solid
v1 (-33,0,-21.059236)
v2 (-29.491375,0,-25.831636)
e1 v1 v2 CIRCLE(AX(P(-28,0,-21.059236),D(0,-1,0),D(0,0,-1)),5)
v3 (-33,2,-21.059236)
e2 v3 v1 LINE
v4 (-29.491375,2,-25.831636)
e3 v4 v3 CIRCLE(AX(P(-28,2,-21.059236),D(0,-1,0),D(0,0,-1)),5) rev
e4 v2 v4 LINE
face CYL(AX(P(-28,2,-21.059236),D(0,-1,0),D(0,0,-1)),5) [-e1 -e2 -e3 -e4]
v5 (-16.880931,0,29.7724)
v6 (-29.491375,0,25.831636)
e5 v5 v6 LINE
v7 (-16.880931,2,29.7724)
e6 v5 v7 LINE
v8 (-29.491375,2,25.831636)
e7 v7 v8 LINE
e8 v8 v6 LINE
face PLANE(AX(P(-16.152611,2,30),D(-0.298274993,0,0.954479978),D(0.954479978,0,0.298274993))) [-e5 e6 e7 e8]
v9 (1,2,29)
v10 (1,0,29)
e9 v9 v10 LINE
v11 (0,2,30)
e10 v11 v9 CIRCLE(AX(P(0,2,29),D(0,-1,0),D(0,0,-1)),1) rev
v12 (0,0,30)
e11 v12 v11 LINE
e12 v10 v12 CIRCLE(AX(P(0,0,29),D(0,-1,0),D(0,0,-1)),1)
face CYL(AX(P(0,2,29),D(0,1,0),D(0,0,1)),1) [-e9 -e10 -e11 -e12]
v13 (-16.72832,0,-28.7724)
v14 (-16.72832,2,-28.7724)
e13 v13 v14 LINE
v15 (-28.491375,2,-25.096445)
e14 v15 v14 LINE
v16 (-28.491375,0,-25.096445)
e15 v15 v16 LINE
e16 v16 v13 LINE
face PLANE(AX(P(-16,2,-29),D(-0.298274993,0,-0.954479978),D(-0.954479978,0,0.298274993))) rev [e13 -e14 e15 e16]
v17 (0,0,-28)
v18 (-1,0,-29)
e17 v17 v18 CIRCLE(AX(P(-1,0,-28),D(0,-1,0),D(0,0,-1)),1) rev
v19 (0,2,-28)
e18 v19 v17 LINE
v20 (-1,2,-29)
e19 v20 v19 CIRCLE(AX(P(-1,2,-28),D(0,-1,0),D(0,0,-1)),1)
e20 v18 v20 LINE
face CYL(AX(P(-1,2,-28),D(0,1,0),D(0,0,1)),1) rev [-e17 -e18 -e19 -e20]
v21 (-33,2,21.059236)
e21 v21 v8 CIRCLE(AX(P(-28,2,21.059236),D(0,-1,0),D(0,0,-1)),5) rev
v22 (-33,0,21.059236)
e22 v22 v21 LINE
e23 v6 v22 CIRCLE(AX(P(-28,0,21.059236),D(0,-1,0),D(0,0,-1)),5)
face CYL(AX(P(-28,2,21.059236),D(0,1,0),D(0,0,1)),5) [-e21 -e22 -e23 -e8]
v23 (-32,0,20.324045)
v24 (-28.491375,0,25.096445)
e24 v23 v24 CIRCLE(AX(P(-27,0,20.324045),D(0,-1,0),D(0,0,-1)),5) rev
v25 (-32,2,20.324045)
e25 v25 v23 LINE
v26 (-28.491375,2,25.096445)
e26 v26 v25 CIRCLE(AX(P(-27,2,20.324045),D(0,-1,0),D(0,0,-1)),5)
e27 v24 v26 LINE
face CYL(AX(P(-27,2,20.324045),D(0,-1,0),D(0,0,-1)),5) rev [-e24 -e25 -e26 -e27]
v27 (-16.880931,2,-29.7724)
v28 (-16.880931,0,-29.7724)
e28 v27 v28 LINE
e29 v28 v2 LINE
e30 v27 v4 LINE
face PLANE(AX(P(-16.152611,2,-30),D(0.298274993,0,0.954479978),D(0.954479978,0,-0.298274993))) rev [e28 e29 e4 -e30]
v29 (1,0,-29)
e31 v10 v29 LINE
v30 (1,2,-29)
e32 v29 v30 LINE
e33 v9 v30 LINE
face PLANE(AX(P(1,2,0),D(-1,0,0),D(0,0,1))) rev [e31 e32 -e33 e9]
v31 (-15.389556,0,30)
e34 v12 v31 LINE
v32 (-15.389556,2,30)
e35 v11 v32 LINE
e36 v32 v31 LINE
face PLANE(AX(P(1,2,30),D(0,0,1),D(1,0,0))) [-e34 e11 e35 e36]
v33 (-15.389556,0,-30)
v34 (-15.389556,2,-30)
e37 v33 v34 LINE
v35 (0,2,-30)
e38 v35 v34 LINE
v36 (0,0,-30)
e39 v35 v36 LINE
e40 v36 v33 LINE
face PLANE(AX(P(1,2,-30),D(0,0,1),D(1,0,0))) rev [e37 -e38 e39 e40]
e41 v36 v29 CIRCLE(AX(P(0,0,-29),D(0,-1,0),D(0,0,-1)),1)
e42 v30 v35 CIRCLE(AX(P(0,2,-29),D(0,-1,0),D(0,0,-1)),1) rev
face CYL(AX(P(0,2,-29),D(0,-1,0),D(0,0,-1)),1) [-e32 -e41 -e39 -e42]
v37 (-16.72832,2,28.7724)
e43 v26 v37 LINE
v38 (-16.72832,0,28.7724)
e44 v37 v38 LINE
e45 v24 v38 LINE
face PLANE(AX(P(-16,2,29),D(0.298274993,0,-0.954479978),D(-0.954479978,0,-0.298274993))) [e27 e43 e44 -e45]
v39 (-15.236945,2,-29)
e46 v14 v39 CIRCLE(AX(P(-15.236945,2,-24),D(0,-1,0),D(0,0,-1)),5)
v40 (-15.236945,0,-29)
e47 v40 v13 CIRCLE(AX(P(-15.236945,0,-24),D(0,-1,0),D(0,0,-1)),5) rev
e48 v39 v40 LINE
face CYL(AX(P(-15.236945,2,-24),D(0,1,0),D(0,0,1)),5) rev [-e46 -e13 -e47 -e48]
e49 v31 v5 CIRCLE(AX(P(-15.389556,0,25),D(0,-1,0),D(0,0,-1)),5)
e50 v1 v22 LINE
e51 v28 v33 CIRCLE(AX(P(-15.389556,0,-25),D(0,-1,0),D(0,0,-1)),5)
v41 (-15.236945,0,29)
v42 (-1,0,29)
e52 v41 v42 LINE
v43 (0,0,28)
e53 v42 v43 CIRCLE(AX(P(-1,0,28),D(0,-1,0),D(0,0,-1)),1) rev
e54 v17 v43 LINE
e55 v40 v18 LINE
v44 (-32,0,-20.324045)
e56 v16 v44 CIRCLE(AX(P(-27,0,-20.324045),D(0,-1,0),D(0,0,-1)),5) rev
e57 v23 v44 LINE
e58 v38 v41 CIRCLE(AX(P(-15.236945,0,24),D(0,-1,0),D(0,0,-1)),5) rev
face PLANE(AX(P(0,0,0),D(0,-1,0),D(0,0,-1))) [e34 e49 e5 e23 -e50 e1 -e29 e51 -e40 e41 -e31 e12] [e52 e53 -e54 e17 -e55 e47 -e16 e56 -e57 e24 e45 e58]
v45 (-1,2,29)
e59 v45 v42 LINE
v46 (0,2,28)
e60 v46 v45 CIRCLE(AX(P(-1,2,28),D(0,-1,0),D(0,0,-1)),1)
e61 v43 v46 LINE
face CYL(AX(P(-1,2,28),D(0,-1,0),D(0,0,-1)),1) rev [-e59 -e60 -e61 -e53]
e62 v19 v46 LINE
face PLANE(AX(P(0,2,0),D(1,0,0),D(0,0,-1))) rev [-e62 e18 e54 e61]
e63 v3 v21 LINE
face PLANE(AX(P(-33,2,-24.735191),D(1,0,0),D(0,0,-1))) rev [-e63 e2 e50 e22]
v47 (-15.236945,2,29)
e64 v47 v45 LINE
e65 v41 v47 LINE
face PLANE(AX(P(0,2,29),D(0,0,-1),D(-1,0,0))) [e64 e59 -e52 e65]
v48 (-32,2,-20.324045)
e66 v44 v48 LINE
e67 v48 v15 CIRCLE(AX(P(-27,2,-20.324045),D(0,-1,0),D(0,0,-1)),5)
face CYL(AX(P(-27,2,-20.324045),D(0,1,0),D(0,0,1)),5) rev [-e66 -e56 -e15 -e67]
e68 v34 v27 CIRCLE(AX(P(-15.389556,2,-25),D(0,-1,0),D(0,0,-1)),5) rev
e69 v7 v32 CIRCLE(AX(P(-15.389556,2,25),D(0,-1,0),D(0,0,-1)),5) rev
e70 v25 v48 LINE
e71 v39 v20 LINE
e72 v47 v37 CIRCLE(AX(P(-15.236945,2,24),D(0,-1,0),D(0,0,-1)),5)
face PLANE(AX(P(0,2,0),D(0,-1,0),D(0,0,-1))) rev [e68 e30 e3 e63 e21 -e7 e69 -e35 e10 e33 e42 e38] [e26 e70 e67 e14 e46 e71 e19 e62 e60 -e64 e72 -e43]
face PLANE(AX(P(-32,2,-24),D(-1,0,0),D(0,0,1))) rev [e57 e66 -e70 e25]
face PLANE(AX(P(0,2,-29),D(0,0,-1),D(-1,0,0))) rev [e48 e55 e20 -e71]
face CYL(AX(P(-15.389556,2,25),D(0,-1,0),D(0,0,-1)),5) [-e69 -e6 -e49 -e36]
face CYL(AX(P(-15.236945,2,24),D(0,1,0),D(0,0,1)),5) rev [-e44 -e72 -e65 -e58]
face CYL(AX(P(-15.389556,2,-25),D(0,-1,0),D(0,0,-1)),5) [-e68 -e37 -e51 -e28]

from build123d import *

# Parameters (mm, degrees)
EXTRUDE_1_DEPTH        = 2
FILLET_1_R             = 5
FILLET_2_R             = 1
FILLET_1_OF_MIRROR_1_R = 5
FILLET_2_OF_MIRROR_1_R = 1


with BuildPart() as part:
    # 草图1 → 凸台-拉伸1 (new body)
    with BuildSketch(Plane(origin=(0, 0, 0), x_dir=(1, 0, 0), z_dir=(0, 1, 0))):
        Polygon((0, 0), (0, 29), (-16, 29), (-32, 24), (-32, 0), (-33, 0), (-33, 24.735190913), (-16.152610923, 30), (1, 30), (1, 0), align=None)
    extrude_1 = extrude(amount=EXTRUDE_1_DEPTH)

    # 圆角1
    fillet_1_edges = [part.edges().sort_by_distance(p)[0] for p in [
        (-16, 1, -29),
        (-16.152610923, 1, -30),
        (-33, 1, -24.735190913),
        (-32, 1, -24),
    ]]
    fillet(fillet_1_edges, radius=FILLET_1_R)

    # 圆角2
    fillet_2_edges = [part.edges().sort_by_distance(p)[0] for p in [
        (1, 1, -30),
        (0, 1, -29),
    ]]
    fillet(fillet_2_edges, radius=FILLET_2_R)

    # 镜向1: 凸台-拉伸1 across plane
    add(extrude_1.mirror(Plane.XY))

    # 圆角1 of 镜向1
    fillet_1_of_mirror_1_edges = [part.edges().sort_by_distance(p)[0] for p in [
        (-16, 1, 29),
        (-16.152610923, 1, 30),
        (-33, 1, 24.735190913),
        (-32, 1, 24),
    ]]
    fillet(fillet_1_of_mirror_1_edges, radius=FILLET_1_OF_MIRROR_1_R)

    # 圆角2 of 镜向1
    fillet_2_of_mirror_1_edges = [part.edges().sort_by_distance(p)[0] for p in [
        (1, 1, 30),
        (0, 1, 29),
    ]]
    fillet(fillet_2_of_mirror_1_edges, radius=FILLET_2_OF_MIRROR_1_R)


solid = part.part
